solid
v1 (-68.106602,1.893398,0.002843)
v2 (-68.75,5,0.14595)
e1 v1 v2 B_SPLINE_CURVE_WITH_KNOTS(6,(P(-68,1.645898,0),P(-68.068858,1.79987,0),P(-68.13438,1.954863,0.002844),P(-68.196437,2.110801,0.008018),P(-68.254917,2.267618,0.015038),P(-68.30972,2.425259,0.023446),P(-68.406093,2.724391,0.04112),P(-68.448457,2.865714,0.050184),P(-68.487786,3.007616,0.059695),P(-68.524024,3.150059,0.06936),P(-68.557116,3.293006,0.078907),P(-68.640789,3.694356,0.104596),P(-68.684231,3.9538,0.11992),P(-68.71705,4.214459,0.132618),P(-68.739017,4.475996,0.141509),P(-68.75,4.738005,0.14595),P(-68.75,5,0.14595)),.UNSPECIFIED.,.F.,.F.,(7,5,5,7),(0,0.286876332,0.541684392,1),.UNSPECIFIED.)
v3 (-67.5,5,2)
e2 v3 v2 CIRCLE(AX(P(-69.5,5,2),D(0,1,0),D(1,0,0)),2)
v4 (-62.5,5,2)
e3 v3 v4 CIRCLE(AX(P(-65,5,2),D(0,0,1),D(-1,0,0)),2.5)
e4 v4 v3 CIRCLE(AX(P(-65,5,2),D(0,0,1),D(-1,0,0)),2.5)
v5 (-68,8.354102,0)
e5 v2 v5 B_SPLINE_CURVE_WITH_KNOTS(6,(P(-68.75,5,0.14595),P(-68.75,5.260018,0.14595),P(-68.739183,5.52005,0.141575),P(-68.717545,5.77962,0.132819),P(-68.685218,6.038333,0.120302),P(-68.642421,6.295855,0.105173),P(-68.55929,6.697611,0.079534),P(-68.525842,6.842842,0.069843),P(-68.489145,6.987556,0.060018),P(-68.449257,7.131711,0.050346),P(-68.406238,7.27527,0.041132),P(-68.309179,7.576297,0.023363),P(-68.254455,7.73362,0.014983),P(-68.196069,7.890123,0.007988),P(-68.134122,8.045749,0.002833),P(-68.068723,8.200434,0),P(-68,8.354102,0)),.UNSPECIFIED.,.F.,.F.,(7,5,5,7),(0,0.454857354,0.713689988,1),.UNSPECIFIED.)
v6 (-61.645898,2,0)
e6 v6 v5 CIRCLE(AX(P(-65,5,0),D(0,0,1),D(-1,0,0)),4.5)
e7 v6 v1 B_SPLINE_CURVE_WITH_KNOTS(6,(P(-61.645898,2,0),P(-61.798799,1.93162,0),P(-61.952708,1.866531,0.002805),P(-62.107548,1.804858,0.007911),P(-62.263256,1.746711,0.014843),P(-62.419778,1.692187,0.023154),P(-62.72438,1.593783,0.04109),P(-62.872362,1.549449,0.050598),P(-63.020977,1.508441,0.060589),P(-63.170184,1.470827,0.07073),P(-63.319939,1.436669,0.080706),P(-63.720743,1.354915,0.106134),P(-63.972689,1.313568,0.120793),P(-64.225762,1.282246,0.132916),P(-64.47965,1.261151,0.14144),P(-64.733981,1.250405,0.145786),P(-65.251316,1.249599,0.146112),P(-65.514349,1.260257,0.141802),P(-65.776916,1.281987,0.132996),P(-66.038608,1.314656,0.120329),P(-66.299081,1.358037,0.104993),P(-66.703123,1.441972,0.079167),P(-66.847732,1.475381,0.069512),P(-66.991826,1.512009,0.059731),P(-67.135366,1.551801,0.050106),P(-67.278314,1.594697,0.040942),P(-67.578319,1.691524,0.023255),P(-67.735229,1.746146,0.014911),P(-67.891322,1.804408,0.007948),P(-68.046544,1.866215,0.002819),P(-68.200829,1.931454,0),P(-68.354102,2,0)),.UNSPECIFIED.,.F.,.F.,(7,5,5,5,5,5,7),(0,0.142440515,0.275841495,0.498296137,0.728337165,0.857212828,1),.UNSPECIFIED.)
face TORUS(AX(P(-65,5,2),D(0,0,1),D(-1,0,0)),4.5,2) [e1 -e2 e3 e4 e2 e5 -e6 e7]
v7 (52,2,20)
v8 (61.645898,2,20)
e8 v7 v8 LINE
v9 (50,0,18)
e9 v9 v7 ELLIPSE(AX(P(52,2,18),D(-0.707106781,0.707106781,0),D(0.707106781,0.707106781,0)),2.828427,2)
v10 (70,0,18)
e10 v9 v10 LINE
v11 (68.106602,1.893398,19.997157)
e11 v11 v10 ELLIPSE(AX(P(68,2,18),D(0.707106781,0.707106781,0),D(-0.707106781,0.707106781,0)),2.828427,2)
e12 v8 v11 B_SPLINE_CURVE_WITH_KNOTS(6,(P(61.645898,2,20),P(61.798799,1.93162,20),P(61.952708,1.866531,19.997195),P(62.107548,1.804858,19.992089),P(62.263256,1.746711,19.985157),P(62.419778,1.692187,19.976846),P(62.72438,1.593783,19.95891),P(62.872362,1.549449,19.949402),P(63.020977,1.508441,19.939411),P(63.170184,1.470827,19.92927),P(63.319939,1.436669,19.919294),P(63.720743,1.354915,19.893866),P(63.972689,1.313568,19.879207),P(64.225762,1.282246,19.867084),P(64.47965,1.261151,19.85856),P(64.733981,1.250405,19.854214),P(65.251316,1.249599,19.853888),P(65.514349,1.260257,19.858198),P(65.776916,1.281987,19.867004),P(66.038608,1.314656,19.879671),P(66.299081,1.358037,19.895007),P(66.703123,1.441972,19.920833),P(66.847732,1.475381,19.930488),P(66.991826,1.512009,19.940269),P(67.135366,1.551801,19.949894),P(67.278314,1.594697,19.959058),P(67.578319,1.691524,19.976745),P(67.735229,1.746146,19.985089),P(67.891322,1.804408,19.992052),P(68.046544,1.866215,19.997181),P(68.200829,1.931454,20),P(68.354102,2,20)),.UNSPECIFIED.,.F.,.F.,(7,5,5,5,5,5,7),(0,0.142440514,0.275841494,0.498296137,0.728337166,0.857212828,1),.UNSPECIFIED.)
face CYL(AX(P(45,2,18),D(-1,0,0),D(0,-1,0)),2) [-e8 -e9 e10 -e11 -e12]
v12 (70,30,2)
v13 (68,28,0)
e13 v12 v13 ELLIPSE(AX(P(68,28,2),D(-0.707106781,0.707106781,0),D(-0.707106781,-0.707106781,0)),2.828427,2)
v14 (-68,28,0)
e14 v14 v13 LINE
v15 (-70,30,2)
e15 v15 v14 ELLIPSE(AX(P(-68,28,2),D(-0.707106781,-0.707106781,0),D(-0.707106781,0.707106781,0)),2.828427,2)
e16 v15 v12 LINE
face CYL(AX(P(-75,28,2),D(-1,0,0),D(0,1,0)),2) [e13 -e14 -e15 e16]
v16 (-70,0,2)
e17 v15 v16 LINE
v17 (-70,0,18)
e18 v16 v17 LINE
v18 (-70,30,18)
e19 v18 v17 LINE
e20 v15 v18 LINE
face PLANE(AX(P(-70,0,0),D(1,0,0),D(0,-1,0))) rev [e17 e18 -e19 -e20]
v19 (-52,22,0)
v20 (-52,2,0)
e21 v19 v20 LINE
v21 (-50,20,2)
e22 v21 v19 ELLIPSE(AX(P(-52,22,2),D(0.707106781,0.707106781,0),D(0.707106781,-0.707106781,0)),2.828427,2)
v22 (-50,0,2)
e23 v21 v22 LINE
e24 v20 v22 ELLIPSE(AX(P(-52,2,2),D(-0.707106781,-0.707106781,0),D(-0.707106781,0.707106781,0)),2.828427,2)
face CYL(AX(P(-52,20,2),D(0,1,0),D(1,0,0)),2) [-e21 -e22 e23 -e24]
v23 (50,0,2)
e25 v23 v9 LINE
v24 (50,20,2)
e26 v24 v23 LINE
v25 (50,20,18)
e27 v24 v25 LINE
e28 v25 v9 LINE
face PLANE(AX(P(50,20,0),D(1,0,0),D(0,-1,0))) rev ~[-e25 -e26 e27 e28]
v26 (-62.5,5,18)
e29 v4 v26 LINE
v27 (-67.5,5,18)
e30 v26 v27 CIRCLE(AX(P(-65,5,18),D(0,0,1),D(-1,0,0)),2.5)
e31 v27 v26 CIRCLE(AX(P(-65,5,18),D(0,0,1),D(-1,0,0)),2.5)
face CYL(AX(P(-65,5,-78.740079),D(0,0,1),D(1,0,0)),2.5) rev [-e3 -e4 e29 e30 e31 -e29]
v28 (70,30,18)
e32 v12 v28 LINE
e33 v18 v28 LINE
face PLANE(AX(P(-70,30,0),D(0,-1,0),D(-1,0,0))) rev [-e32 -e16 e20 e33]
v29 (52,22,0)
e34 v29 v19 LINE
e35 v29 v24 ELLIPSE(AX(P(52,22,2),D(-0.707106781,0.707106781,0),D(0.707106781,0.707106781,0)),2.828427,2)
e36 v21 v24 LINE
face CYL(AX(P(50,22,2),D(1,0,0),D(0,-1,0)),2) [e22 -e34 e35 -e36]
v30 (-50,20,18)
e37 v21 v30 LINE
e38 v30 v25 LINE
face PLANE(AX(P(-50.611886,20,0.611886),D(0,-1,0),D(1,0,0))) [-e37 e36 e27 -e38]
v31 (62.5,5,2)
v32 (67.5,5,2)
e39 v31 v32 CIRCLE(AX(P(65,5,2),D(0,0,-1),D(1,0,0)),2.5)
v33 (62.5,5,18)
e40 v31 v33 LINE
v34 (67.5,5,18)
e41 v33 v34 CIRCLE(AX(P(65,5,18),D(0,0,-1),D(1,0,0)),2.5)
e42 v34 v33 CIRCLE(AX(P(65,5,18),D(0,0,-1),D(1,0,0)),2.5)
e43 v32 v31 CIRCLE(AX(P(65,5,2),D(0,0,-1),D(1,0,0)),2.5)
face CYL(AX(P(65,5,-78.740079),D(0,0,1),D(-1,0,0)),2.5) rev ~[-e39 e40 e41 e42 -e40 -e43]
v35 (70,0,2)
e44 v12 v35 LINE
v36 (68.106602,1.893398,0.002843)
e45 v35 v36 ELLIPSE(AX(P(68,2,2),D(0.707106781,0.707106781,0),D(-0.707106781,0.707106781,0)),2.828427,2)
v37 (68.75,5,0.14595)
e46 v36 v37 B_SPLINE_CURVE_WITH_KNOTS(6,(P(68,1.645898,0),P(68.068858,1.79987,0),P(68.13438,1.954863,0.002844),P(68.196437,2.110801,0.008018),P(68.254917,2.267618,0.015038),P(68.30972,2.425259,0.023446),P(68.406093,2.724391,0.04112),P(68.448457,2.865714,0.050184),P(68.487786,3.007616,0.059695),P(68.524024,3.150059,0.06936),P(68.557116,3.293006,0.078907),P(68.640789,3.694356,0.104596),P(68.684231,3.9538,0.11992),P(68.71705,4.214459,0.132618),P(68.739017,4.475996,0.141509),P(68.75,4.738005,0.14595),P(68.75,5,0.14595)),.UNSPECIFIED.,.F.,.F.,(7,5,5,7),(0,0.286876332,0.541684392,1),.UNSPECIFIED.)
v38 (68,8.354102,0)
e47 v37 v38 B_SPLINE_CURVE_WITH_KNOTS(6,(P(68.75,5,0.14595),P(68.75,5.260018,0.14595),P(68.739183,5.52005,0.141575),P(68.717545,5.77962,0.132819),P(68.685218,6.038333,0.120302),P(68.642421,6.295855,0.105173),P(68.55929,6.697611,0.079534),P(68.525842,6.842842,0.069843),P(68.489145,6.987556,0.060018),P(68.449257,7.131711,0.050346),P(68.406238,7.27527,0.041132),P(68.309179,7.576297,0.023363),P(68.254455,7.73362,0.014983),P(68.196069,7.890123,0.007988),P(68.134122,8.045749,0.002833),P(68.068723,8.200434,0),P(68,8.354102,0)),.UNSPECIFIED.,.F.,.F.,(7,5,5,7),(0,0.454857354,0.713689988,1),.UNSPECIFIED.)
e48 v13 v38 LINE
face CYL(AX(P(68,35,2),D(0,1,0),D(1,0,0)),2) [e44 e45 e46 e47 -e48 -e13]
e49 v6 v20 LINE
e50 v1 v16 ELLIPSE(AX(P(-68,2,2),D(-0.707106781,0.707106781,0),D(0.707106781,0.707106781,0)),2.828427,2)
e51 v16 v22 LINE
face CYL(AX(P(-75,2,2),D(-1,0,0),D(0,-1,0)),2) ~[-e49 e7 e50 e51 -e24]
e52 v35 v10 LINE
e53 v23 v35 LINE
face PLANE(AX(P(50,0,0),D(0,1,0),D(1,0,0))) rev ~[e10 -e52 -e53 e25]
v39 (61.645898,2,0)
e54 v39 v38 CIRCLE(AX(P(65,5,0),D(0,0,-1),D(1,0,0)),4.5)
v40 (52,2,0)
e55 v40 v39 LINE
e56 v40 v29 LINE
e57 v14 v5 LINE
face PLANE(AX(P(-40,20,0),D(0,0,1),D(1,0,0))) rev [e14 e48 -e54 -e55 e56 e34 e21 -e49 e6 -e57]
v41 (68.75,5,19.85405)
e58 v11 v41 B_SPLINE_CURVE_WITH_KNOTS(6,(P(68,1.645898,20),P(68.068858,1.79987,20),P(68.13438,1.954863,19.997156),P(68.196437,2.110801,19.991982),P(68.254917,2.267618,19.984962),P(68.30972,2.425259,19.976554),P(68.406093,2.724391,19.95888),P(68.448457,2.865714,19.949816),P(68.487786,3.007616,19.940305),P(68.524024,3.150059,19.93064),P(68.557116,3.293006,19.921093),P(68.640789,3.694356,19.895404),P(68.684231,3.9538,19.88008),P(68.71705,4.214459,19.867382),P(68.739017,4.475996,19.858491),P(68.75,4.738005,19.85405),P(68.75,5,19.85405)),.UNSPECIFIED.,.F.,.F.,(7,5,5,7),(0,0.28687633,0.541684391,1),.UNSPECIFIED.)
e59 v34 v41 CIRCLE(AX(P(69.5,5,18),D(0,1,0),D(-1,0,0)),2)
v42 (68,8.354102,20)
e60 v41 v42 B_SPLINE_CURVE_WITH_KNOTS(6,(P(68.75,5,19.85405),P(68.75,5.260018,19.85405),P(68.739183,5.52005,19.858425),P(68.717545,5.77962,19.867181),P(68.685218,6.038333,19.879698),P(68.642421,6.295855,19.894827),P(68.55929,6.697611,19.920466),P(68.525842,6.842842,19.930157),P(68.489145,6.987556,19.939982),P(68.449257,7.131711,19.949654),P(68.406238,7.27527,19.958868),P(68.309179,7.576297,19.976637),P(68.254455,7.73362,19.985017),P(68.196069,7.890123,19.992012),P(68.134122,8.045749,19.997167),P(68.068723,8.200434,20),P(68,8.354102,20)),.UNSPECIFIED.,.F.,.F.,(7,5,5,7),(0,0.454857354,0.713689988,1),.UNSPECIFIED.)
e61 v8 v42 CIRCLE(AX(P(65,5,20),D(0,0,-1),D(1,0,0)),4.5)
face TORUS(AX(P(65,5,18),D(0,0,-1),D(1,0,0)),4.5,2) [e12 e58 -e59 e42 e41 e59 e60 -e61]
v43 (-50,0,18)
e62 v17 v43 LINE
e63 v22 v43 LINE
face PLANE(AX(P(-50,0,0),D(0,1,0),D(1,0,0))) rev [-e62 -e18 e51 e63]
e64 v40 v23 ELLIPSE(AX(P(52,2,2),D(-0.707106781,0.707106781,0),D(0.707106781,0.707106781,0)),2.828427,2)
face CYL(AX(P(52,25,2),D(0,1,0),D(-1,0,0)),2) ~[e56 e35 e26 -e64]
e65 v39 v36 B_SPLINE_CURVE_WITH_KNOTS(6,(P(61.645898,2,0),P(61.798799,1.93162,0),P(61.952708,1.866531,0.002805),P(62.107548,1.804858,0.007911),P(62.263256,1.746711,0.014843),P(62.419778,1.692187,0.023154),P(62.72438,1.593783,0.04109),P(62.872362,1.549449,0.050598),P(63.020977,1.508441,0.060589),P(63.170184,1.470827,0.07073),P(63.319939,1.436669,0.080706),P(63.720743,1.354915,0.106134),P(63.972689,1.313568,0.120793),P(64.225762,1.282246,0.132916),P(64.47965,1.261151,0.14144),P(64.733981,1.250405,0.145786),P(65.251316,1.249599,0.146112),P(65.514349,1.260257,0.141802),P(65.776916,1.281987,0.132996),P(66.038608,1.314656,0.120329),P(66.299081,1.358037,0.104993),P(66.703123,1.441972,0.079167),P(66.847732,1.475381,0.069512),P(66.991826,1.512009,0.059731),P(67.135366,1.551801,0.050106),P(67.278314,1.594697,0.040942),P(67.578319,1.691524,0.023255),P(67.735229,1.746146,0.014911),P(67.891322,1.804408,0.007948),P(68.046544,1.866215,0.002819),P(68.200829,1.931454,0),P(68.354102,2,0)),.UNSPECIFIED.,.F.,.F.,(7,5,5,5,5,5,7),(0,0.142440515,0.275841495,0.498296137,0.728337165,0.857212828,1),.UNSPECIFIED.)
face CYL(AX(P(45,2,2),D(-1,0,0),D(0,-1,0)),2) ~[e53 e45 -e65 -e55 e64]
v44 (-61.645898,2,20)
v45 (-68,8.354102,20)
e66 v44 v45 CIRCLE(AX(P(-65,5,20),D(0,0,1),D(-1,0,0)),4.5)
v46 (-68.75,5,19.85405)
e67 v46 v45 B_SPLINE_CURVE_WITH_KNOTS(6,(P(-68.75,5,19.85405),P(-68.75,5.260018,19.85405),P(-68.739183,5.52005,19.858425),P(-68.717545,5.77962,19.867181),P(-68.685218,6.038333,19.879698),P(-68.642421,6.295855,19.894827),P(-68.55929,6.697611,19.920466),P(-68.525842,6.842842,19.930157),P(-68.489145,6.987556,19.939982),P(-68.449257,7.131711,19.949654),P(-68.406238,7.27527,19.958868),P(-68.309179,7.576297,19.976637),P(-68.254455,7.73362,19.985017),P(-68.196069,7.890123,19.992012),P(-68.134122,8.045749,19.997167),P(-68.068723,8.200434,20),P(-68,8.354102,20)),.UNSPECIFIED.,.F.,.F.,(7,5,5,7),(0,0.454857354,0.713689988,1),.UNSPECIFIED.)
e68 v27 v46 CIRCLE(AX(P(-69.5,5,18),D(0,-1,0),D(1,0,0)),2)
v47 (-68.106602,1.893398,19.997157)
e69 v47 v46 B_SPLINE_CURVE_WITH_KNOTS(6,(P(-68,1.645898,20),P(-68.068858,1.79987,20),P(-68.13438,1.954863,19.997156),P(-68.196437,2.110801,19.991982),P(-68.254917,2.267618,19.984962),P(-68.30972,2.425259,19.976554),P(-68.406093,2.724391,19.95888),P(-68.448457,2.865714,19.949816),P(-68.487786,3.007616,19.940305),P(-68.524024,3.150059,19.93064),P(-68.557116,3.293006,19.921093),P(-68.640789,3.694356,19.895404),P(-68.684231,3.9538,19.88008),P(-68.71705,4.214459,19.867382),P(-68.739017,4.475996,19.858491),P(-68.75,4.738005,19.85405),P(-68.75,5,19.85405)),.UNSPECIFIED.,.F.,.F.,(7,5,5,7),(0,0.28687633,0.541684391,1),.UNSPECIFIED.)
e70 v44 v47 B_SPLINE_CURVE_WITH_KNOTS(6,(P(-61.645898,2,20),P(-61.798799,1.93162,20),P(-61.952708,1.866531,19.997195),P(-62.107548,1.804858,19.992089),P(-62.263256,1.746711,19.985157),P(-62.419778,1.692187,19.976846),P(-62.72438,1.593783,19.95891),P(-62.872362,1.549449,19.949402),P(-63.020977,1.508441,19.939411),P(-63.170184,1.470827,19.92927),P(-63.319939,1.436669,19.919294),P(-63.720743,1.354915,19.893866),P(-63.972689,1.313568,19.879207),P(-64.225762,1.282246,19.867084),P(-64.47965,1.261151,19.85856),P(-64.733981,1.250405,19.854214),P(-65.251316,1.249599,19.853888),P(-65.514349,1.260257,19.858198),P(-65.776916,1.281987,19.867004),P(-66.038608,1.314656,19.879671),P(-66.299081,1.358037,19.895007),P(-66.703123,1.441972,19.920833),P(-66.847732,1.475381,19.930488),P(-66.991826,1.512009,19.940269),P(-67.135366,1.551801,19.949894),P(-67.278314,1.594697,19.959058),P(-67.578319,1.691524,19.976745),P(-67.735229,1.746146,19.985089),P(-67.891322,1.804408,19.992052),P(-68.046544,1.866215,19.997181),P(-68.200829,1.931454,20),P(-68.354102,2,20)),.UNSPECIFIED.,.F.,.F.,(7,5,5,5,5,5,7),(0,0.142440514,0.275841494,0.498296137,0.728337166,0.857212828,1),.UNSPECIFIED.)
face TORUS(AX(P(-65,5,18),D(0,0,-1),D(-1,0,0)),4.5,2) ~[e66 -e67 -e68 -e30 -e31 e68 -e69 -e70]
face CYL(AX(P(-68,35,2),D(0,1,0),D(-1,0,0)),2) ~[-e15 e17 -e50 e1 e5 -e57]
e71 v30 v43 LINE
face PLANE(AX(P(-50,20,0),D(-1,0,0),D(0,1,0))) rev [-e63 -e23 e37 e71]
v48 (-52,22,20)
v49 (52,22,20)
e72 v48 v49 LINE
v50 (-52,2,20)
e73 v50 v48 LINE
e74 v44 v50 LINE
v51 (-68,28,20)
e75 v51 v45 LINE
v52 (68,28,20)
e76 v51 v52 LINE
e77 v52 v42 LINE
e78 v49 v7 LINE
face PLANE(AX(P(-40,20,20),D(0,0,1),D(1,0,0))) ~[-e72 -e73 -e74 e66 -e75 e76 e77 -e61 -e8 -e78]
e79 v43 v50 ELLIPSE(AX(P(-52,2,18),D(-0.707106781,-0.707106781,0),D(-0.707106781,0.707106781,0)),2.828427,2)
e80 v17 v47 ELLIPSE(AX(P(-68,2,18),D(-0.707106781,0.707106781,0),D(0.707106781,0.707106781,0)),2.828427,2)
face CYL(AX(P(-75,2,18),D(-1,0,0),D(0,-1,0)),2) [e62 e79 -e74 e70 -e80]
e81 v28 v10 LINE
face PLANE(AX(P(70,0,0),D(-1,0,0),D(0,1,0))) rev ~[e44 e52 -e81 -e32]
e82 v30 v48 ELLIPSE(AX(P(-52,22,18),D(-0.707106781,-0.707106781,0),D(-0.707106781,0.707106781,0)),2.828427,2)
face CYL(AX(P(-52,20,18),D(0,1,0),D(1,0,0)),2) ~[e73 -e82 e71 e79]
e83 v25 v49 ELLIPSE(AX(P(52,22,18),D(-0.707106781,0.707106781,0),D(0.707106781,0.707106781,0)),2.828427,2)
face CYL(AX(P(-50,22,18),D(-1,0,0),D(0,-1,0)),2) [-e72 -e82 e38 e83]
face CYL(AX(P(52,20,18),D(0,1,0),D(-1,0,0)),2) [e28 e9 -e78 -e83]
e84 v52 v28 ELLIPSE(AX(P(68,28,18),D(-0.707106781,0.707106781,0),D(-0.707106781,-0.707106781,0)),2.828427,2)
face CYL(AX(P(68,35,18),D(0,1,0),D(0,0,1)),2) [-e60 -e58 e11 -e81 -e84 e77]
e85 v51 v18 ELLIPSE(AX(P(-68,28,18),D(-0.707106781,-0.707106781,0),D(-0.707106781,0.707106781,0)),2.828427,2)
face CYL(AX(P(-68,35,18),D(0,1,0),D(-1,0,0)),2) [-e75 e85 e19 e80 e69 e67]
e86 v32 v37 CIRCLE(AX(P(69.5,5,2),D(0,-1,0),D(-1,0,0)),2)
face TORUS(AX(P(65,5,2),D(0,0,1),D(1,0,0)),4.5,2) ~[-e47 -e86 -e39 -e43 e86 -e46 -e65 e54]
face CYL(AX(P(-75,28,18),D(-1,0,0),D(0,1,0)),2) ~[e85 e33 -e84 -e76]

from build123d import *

# Parameters (mm, degrees)
F1_DEPTH     = 20
F3_D         = 5
F5_T1_DEPTH  = 150
F5_T3_DEPTH  = 40
F5_T5_DEPTH  = 30
F5_T7_DEPTH  = 25
F5_T9_DEPTH  = 100
F5_T11_DEPTH = 30
F5_T21_DEPTH = 105
F5_T25_DEPTH = 30
F5_T32_DEPTH = 30
F5_T36_DEPTH = 105
F6_T1_DEPTH  = 150
F6_T3_DEPTH  = 40
F6_T5_DEPTH  = 30
F6_T7_DEPTH  = 25
F6_T9_DEPTH  = 100
F6_T11_DEPTH = 30
F6_T21_DEPTH = 105
F6_T25_DEPTH = 30
F6_T32_DEPTH = 30
F6_T36_DEPTH = 105


# Not quite as in the source:
# - a fillet or chamfer that OpenCascade refuses, or shapes differently, is made with other operations: its cross-section is extruded or revolved along the edge and cut away or added


with BuildPart() as f1:
    # F0 (on Top) → F1 (new body)
    with BuildSketch(Plane.XY):
        Polygon((70, 30), (0, 30), (0, 20), (50, 20), (50, 0), (70, 0), align=None)
    extrude(amount=F1_DEPTH)

    # F3 (through all)
    with Locations(Plane(origin=(0, 0, 0), x_dir=(1, 0, 0), z_dir=(0, 0, -1))):
        with Locations((65, -5)):
            Hole(F3_D / 2)

    # F4: F1 across face


with BuildPart() as f1_1:
    add(f1.part)
    add(f1.part.mirror(Plane(origin=(0, 25, 10), x_dir=(0, -1, 0), z_dir=(-1, 0, 0))))

    # F5: fillet of radius 2 on 10 edges, made by hand

    # F5_s2 → F5_t1 (cut)
    with BuildSketch(Plane.YZ.offset(-75)):
        with BuildLine():
            ThreePointArc((30, 18), (29.4142135624, 19.4142135624), (28, 20))
            Line((28, 20), (30, 20))
            Line((30, 20), (30, 18))
        make_face()
    extrude(amount=F5_T1_DEPTH, mode=Mode.SUBTRACT)

    # F5_s4 → F5_t3 (cut)
    with BuildSketch(Plane.XZ.offset(-35)):
        with BuildLine():
            ThreePointArc((-70, 18), (-69.4142135624, 19.4142135624), (-68, 20))
            Line((-68, 20), (-70, 20))
            Line((-70, 20), (-70, 18))
        make_face()
        with BuildLine():
            ThreePointArc((68, 20), (69.4142135624, 19.4142135624), (70, 18))
            Line((70, 18), (70, 20))
            Line((70, 20), (68, 20))
        make_face()
    extrude(amount=F5_T3_DEPTH, mode=Mode.SUBTRACT)

    # F5_s6 → F5_t5 (cut)
    with BuildSketch(Plane.YZ.offset(-75)):
        with BuildLine():
            ThreePointArc((0, 18), (0.5857864376, 19.4142135624), (2, 20))
            Line((2, 20), (0, 20))
            Line((0, 20), (0, 18))
        make_face()
    extrude(amount=F5_T5_DEPTH, mode=Mode.SUBTRACT)

    # F5_s8 → F5_t7 (cut)
    with BuildSketch(Plane.XZ.offset(-20)):
        with BuildLine():
            ThreePointArc((-50, 18), (-50.5857864376, 19.4142135624), (-52, 20))
            Line((-52, 20), (-50, 20))
            Line((-50, 20), (-50, 18))
        make_face()
        with BuildLine():
            ThreePointArc((50, 18), (50.5857864376, 19.4142135624), (52, 20))
            Line((52, 20), (50, 20))
            Line((50, 20), (50, 18))
        make_face()
    extrude(amount=F5_T7_DEPTH, mode=Mode.SUBTRACT)

    # F5_s10 → F5_t9 (cut)
    with BuildSketch(Plane.YZ.offset(-50)):
        with BuildLine():
            ThreePointArc((20, 18), (20.5857864376, 19.4142135624), (22, 20))
            Line((22, 20), (20, 20))
            Line((20, 20), (20, 18))
        make_face()
    extrude(amount=F5_T9_DEPTH, mode=Mode.SUBTRACT)

    # F5_s12 → F5_t11 (cut)
    with BuildSketch(Plane.YZ.offset(45)):
        with BuildLine():
            ThreePointArc((0, 18), (0.5857864376, 19.4142135624), (2, 20))
            Line((2, 20), (0, 20))
            Line((0, 20), (0, 18))
        make_face()
    extrude(amount=F5_T11_DEPTH, mode=Mode.SUBTRACT)

    # F5_s13 → F5_t14 (revolve, cut)
    with BuildSketch(Plane.XZ.offset(-5)):
        with BuildLine():
            ThreePointArc((67.5, 18), (68.0857864376, 19.4142135624), (69.5, 20))
            Line((69.5, 20), (67.5, 20))
            Line((67.5, 20), (67.5, 18))
        make_face()
    revolve(axis=Axis((65, 5, 20), (0, 0, -1)), mode=Mode.SUBTRACT)

    # F5_s15 → F5_t16 (revolve, cut)
    with BuildSketch(Plane.XZ.offset(-5)):
        with BuildLine():
            ThreePointArc((-67.5, 18), (-68.0857864376, 19.4142135624), (-69.5, 20))
            Line((-69.5, 20), (-67.5, 20))
            Line((-67.5, 20), (-67.5, 18))
        make_face()
    revolve(axis=Axis((-65, 5, 20), (0, 0, 1)), mode=Mode.SUBTRACT)


with BuildPart() as f5_tool19:
    # F5_s20 → F5_t21 (new body)
    with BuildSketch(Plane.YZ.offset(-55)):
        with BuildLine():
            ThreePointArc((20, 18), (20.5857864376, 19.4142135624), (22, 20))
            Line((22, 20), (20, 20))
            Line((20, 20), (20, 18))
        make_face()
    extrude(amount=F5_T21_DEPTH)

    split(bisect_by=Plane.YZ.offset(-50), keep=Keep.BOTTOM)


with BuildPart() as f5_tool23:
    # F5_s24 → F5_t25 (new body)
    with BuildSketch(Plane.XZ.offset(-25)):
        with BuildLine():
            ThreePointArc((-50, 18), (-50.5857864376, 19.4142135624), (-52, 20))
            Line((-52, 20), (-50, 20))
            Line((-50, 20), (-50, 18))
        make_face()
    extrude(amount=F5_T25_DEPTH)

    split(bisect_by=Plane.XZ.offset(-20), keep=Keep.BOTTOM)


with BuildPart() as f5_tool19_1:
    add(f5_tool19.part)

    # F5_t27: intersect F5_tool23
    add(f5_tool23.part, mode=Mode.INTERSECT)


with BuildPart() as f1_2:
    add(f1_1.part)

    # F5_t17: cut F5_tool19
    add(f5_tool19_1.part, mode=Mode.SUBTRACT)


with BuildPart() as f5_tool30:
    # F5_s31 → F5_t32 (new body)
    with BuildSketch(Plane.XZ.offset(-25)):
        with BuildLine():
            ThreePointArc((50, 18), (50.5857864376, 19.4142135624), (52, 20))
            Line((52, 20), (50, 20))
            Line((50, 20), (50, 18))
        make_face()
    extrude(amount=F5_T32_DEPTH)

    split(bisect_by=Plane.XZ.offset(-20), keep=Keep.BOTTOM)


with BuildPart() as f5_tool34:
    # F5_s35 → F5_t36 (new body)
    with BuildSketch(Plane.YZ.offset(-50)):
        with BuildLine():
            ThreePointArc((20, 18), (20.5857864376, 19.4142135624), (22, 20))
            Line((22, 20), (20, 20))
            Line((20, 20), (20, 18))
        make_face()
    extrude(amount=F5_T36_DEPTH)

    split(bisect_by=Plane.YZ.offset(50), keep=Keep.TOP)


with BuildPart() as f5_tool30_1:
    add(f5_tool30.part)

    # F5_t38: intersect F5_tool34
    add(f5_tool34.part, mode=Mode.INTERSECT)


with BuildPart() as f1_3:
    add(f1_2.part)

    # F5_t28: cut F5_tool30
    add(f5_tool30_1.part, mode=Mode.SUBTRACT)

    # F6: fillet of radius 2 on 10 edges, made by hand

    # F6_s2 → F6_t1 (cut)
    with BuildSketch(Plane.YZ.offset(-75)):
        with BuildLine():
            ThreePointArc((30, 2), (29.4142135624, 0.5857864376), (28, 0))
            Line((28, 0), (30, 0))
            Line((30, 0), (30, 2))
        make_face()
    extrude(amount=F6_T1_DEPTH, mode=Mode.SUBTRACT)

    # F6_s4 → F6_t3 (cut)
    with BuildSketch(Plane.XZ.offset(-35)):
        with BuildLine():
            ThreePointArc((-70, 2), (-69.4142135624, 0.5857864376), (-68, 0))
            Line((-68, 0), (-70, 0))
            Line((-70, 0), (-70, 2))
        make_face()
        with BuildLine():
            ThreePointArc((70, 2), (69.4142135624, 0.5857864376), (68, 0))
            Line((68, 0), (70, 0))
            Line((70, 0), (70, 2))
        make_face()
    extrude(amount=F6_T3_DEPTH, mode=Mode.SUBTRACT)

    # F6_s6 → F6_t5 (cut)
    with BuildSketch(Plane.YZ.offset(-75)):
        with BuildLine():
            ThreePointArc((0, 2), (0.5857864376, 0.5857864376), (2, 0))
            Line((2, 0), (0, 0))
            Line((0, 0), (0, 2))
        make_face()
    extrude(amount=F6_T5_DEPTH, mode=Mode.SUBTRACT)

    # F6_s8 → F6_t7 (cut)
    with BuildSketch(Plane.XZ.offset(-20)):
        with BuildLine():
            ThreePointArc((-50, 2), (-50.5857864376, 0.5857864376), (-52, 0))
            Line((-52, 0), (-50, 0))
            Line((-50, 0), (-50, 2))
        make_face()
        with BuildLine():
            ThreePointArc((50, 2), (50.5857864376, 0.5857864376), (52, 0))
            Line((52, 0), (50, 0))
            Line((50, 0), (50, 2))
        make_face()
    extrude(amount=F6_T7_DEPTH, mode=Mode.SUBTRACT)

    # F6_s10 → F6_t9 (cut)
    with BuildSketch(Plane.YZ.offset(-50)):
        with BuildLine():
            ThreePointArc((20, 2), (20.5857864376, 0.5857864376), (22, 0))
            Line((22, 0), (20, 0))
            Line((20, 0), (20, 2))
        make_face()
    extrude(amount=F6_T9_DEPTH, mode=Mode.SUBTRACT)

    # F6_s12 → F6_t11 (cut)
    with BuildSketch(Plane.YZ.offset(45)):
        with BuildLine():
            ThreePointArc((0, 2), (0.5857864376, 0.5857864376), (2, 0))
            Line((2, 0), (0, 0))
            Line((0, 0), (0, 2))
        make_face()
    extrude(amount=F6_T11_DEPTH, mode=Mode.SUBTRACT)

    # F6_s13 → F6_t14 (revolve, cut)
    with BuildSketch(Plane.XZ.offset(-5)):
        with BuildLine():
            ThreePointArc((67.5, 2), (68.0857864376, 0.5857864376), (69.5, 0))
            Line((69.5, 0), (67.5, 0))
            Line((67.5, 0), (67.5, 2))
        make_face()
    revolve(axis=Axis((65, 5, 0), (0, 0, -1)), mode=Mode.SUBTRACT)

    # F6_s15 → F6_t16 (revolve, cut)
    with BuildSketch(Plane.XZ.offset(-5)):
        with BuildLine():
            ThreePointArc((-67.5, 2), (-68.0857864376, 0.5857864376), (-69.5, 0))
            Line((-69.5, 0), (-67.5, 0))
            Line((-67.5, 0), (-67.5, 2))
        make_face()
    revolve(axis=Axis((-65, 5, 0), (0, 0, 1)), mode=Mode.SUBTRACT)


with BuildPart() as f6_tool19:
    # F6_s20 → F6_t21 (new body)
    with BuildSketch(Plane.YZ.offset(50)):
        with BuildLine():
            ThreePointArc((20, 2), (20.5857864376, 0.5857864376), (22, 0))
            Line((22, 0), (20, 0))
            Line((20, 0), (20, 2))
        make_face()
    extrude(amount=-F6_T21_DEPTH)

    split(bisect_by=Plane.YZ.offset(-50), keep=Keep.BOTTOM)


with BuildPart() as f6_tool23:
    # F6_s24 → F6_t25 (new body)
    with BuildSketch(Plane.XZ.offset(-25)):
        with BuildLine():
            ThreePointArc((-50, 2), (-50.5857864376, 0.5857864376), (-52, 0))
            Line((-52, 0), (-50, 0))
            Line((-50, 0), (-50, 2))
        make_face()
    extrude(amount=F6_T25_DEPTH)

    split(bisect_by=Plane.XZ.offset(-20), keep=Keep.BOTTOM)


with BuildPart() as f6_tool19_1:
    add(f6_tool19.part)

    # F6_t27: intersect F6_tool23
    add(f6_tool23.part, mode=Mode.INTERSECT)


with BuildPart() as f1_4:
    add(f1_3.part)

    # F6_t17: cut F6_tool19
    add(f6_tool19_1.part, mode=Mode.SUBTRACT)


with BuildPart() as f6_tool30:
    # F6_s31 → F6_t32 (new body)
    with BuildSketch(Plane.XZ.offset(-25)):
        with BuildLine():
            ThreePointArc((50, 2), (50.5857864376, 0.5857864376), (52, 0))
            Line((52, 0), (50, 0))
            Line((50, 0), (50, 2))
        make_face()
    extrude(amount=F6_T32_DEPTH)

    split(bisect_by=Plane.XZ.offset(-20), keep=Keep.BOTTOM)


with BuildPart() as f6_tool34:
    # F6_s35 → F6_t36 (new body)
    with BuildSketch(Plane.YZ.offset(55)):
        with BuildLine():
            ThreePointArc((20, 2), (20.5857864376, 0.5857864376), (22, 0))
            Line((22, 0), (20, 0))
            Line((20, 0), (20, 2))
        make_face()
    extrude(amount=-F6_T36_DEPTH)

    split(bisect_by=Plane.YZ.offset(50), keep=Keep.TOP)


with BuildPart() as f6_tool30_1:
    add(f6_tool30.part)

    # F6_t38: intersect F6_tool34
    add(f6_tool34.part, mode=Mode.INTERSECT)


with BuildPart() as f1_5:
    add(f1_4.part)

    # F6_t28: cut F6_tool30
    add(f6_tool30_1.part, mode=Mode.SUBTRACT)


solid = f1_5.part
